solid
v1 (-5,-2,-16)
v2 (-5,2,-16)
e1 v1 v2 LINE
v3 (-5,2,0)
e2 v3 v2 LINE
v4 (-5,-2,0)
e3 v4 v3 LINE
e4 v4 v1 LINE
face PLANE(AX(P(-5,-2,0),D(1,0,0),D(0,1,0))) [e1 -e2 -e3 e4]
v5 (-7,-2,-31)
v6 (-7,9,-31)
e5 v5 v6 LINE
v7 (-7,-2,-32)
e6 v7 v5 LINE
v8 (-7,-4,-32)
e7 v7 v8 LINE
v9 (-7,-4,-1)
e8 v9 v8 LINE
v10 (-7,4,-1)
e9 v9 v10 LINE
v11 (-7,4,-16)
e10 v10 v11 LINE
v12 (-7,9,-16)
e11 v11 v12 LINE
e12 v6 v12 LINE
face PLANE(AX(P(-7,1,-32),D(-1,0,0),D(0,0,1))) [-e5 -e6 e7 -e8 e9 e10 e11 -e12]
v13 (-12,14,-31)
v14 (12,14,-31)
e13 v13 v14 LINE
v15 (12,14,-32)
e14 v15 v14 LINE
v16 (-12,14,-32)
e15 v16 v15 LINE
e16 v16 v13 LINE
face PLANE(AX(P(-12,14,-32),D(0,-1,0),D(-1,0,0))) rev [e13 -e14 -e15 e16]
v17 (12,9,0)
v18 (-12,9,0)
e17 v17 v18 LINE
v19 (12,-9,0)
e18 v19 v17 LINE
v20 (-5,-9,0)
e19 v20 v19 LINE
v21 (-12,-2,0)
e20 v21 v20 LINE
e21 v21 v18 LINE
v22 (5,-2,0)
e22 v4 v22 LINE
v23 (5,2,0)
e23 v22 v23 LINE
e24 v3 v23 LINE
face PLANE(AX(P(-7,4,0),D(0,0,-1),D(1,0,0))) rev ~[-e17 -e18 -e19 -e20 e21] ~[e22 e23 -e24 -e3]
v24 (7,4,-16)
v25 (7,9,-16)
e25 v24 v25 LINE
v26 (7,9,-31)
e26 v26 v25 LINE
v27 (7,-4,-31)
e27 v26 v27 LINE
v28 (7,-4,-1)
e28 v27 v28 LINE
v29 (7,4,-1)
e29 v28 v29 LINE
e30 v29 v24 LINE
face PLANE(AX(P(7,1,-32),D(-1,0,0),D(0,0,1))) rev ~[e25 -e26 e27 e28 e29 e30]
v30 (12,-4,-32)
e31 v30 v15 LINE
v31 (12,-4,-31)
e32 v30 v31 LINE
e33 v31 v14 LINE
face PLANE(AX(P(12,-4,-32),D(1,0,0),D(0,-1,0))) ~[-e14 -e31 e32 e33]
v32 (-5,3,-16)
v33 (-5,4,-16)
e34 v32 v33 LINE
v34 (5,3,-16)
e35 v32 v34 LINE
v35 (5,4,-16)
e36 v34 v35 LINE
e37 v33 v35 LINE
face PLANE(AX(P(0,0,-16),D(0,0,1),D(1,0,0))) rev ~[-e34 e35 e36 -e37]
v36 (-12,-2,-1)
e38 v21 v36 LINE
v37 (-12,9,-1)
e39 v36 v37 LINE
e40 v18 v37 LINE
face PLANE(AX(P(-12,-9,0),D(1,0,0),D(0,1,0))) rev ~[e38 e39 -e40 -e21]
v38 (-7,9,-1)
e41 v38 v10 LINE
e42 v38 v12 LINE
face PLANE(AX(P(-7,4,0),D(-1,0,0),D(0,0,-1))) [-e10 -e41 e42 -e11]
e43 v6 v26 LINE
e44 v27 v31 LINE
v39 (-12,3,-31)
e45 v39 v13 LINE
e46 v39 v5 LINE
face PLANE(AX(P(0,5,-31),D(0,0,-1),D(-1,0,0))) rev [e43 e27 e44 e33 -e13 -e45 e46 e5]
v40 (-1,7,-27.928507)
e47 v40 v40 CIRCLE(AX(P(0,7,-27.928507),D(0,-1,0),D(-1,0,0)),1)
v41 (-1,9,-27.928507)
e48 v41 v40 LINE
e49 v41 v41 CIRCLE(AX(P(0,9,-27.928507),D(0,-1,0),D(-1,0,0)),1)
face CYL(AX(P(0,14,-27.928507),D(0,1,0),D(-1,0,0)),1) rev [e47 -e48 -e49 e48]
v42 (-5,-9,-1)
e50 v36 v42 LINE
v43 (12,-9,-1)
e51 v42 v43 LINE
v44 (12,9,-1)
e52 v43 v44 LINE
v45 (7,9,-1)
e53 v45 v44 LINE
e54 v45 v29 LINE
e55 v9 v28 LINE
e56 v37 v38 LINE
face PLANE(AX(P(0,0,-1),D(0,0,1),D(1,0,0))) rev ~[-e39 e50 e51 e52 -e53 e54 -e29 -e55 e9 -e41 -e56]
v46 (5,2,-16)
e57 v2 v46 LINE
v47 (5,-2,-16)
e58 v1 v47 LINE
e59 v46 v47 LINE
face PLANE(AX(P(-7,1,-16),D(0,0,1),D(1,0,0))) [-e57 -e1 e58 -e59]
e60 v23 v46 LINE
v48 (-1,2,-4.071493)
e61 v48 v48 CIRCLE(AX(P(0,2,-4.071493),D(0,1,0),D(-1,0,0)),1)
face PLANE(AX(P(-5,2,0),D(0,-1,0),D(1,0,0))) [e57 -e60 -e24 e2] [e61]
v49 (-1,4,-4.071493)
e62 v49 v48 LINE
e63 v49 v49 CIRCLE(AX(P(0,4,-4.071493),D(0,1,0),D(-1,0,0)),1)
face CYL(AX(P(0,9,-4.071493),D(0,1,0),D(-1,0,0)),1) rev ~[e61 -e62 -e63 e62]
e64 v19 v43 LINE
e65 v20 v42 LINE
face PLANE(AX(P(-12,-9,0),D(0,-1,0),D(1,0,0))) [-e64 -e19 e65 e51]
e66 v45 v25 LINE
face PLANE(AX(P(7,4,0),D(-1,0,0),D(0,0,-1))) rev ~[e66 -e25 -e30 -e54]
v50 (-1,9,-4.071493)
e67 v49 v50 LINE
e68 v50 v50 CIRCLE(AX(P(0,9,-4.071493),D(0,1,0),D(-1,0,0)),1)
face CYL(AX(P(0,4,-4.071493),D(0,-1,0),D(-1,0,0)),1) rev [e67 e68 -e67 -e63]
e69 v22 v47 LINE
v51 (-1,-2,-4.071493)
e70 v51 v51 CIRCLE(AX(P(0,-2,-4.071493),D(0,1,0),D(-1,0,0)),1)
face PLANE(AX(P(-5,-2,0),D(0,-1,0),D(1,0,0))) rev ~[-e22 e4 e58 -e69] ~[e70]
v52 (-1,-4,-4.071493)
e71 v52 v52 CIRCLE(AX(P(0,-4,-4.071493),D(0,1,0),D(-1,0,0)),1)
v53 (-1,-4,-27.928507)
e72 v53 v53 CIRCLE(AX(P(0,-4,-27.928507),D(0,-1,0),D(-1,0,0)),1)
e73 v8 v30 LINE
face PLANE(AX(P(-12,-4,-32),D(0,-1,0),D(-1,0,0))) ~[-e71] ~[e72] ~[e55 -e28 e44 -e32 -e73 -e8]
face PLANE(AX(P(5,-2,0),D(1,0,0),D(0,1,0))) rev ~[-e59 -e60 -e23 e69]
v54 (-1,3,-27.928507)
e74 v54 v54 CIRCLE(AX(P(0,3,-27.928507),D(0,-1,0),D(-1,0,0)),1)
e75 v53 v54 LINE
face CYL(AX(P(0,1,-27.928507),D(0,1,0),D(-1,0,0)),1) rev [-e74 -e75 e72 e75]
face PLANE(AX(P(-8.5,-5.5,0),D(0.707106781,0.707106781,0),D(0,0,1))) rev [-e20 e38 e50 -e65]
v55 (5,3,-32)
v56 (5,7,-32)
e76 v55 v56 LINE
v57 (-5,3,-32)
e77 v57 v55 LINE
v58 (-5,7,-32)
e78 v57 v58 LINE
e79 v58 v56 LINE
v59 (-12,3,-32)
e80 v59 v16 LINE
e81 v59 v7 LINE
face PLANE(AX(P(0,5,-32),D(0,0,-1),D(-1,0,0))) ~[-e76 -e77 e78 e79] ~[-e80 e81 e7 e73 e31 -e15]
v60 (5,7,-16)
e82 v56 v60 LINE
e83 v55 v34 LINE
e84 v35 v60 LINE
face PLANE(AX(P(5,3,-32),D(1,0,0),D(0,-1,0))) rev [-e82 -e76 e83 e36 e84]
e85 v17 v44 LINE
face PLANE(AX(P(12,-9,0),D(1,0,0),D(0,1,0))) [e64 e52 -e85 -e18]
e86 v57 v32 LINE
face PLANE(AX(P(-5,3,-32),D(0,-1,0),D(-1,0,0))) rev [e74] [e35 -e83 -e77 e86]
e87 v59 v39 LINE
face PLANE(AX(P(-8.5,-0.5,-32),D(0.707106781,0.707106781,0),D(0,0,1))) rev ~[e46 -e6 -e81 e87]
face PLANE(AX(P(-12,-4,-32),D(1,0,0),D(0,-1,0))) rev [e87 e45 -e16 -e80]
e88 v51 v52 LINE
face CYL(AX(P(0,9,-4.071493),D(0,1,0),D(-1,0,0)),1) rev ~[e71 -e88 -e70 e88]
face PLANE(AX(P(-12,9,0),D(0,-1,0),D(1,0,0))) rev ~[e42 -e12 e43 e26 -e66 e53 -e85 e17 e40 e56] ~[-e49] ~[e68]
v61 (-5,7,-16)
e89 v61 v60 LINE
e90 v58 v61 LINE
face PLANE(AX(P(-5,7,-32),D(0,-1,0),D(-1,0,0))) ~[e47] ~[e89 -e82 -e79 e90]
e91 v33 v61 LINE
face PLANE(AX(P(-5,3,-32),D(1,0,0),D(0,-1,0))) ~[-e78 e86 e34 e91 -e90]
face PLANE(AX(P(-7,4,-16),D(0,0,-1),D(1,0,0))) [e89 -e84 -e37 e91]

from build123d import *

# Parameters (mm, degrees)
F0_W      = 14
F0_H      = 8
F0_W_2    = 10
F0_H_2    = 4
F1_DEPTH  = 16
F2_W      = 24
F2_H      = 18
F2_W_2    = 14
F2_H_2    = 8
F3_DEPTH  = 1
F4_R      = 1
F5_DEPTH  = 18.001
F6_SIZE   = 7
F9_DEPTH  = 5
F10_DEPTH = 5


with BuildPart() as f1:
    # F0 (on Top) → F1 (new body)
    with BuildSketch(Plane.XY):
        Rectangle(F0_W, F0_H)
        Rectangle(F0_W_2, F0_H_2, mode=Mode.SUBTRACT)
    extrude(amount=-F1_DEPTH)

    # F4 (on face) → F5 (cut, through all)
    with BuildSketch(Plane(origin=(0, 9, 0), x_dir=(-1, 0, 0), z_dir=(0, 1, 0))):
        with BuildLine():
            ThreePointArc((1, -28), (0, -27), (-1, -28))
            Line((-1, -28), (1, -28))
        make_face()
        with BuildLine():
            Line((1, -28), (-1, -28))
            ThreePointArc((-1, -28), (0, -29), (1, -28))
        make_face()
        with Locations((0, -4.0714931674)):
            Circle(F4_R)
    extrude(amount=-F5_DEPTH, mode=Mode.SUBTRACT)


with BuildPart() as f3:
    # F2 (on face) → F3 (new body)
    with BuildSketch(Plane.XY):
        Rectangle(F2_W, F2_H)
        Rectangle(F2_W_2, F2_H_2, mode=Mode.SUBTRACT)
    extrude(amount=-F3_DEPTH)

    # F6
    f6_edges = [f3.edges().sort_by_distance(p)[0] for p in [
        (-12, -9, -0.5),
    ]]
    chamfer(f6_edges, length=F6_SIZE)


with BuildPart() as f7_1:
    # F7: instance of F3
    add(f3.part.mirror(Plane(origin=(0, 0, -16), x_dir=(1, 0, 0), z_dir=(0, 0, -1))))


with BuildPart() as f7_2:
    # F7: instance of F1
    add(f1.part.mirror(Plane(origin=(0, 0, -16), x_dir=(1, 0, 0), z_dir=(0, 0, -1))))


with BuildPart() as f7_2_1:
    # F8: moved
    add(f7_2.part.moved(Location((0, 5, 0))))


with BuildPart() as f7_1_1:
    # F8: moved
    add(f7_1.part.moved(Location((0, 5, 0))))


with BuildPart() as f1_1:
    add(f1.part)

    # F9 (add, through all): a face of the model
    f9_faces = [f7_2_1.part.faces().sort_by_distance(p)[0] for p in [
        (0, 1, -23.9441190926),
    ]]

    add(f7_1_1.part)  # F9 merges F7_1

    add(f7_2_1.part)  # F9 merges F7_2
    extrude(f9_faces, amount=F9_DEPTH)

    # F10 (add, through all): a face of the model
    f10_faces = [f1_1.faces().sort_by_distance(p)[0] for p in [
        (0, 4, -8.0558809074),
    ]]

    add(f3.part)  # F10 merges F3
    extrude(f10_faces, amount=F10_DEPTH)


solid = f1_1.part
